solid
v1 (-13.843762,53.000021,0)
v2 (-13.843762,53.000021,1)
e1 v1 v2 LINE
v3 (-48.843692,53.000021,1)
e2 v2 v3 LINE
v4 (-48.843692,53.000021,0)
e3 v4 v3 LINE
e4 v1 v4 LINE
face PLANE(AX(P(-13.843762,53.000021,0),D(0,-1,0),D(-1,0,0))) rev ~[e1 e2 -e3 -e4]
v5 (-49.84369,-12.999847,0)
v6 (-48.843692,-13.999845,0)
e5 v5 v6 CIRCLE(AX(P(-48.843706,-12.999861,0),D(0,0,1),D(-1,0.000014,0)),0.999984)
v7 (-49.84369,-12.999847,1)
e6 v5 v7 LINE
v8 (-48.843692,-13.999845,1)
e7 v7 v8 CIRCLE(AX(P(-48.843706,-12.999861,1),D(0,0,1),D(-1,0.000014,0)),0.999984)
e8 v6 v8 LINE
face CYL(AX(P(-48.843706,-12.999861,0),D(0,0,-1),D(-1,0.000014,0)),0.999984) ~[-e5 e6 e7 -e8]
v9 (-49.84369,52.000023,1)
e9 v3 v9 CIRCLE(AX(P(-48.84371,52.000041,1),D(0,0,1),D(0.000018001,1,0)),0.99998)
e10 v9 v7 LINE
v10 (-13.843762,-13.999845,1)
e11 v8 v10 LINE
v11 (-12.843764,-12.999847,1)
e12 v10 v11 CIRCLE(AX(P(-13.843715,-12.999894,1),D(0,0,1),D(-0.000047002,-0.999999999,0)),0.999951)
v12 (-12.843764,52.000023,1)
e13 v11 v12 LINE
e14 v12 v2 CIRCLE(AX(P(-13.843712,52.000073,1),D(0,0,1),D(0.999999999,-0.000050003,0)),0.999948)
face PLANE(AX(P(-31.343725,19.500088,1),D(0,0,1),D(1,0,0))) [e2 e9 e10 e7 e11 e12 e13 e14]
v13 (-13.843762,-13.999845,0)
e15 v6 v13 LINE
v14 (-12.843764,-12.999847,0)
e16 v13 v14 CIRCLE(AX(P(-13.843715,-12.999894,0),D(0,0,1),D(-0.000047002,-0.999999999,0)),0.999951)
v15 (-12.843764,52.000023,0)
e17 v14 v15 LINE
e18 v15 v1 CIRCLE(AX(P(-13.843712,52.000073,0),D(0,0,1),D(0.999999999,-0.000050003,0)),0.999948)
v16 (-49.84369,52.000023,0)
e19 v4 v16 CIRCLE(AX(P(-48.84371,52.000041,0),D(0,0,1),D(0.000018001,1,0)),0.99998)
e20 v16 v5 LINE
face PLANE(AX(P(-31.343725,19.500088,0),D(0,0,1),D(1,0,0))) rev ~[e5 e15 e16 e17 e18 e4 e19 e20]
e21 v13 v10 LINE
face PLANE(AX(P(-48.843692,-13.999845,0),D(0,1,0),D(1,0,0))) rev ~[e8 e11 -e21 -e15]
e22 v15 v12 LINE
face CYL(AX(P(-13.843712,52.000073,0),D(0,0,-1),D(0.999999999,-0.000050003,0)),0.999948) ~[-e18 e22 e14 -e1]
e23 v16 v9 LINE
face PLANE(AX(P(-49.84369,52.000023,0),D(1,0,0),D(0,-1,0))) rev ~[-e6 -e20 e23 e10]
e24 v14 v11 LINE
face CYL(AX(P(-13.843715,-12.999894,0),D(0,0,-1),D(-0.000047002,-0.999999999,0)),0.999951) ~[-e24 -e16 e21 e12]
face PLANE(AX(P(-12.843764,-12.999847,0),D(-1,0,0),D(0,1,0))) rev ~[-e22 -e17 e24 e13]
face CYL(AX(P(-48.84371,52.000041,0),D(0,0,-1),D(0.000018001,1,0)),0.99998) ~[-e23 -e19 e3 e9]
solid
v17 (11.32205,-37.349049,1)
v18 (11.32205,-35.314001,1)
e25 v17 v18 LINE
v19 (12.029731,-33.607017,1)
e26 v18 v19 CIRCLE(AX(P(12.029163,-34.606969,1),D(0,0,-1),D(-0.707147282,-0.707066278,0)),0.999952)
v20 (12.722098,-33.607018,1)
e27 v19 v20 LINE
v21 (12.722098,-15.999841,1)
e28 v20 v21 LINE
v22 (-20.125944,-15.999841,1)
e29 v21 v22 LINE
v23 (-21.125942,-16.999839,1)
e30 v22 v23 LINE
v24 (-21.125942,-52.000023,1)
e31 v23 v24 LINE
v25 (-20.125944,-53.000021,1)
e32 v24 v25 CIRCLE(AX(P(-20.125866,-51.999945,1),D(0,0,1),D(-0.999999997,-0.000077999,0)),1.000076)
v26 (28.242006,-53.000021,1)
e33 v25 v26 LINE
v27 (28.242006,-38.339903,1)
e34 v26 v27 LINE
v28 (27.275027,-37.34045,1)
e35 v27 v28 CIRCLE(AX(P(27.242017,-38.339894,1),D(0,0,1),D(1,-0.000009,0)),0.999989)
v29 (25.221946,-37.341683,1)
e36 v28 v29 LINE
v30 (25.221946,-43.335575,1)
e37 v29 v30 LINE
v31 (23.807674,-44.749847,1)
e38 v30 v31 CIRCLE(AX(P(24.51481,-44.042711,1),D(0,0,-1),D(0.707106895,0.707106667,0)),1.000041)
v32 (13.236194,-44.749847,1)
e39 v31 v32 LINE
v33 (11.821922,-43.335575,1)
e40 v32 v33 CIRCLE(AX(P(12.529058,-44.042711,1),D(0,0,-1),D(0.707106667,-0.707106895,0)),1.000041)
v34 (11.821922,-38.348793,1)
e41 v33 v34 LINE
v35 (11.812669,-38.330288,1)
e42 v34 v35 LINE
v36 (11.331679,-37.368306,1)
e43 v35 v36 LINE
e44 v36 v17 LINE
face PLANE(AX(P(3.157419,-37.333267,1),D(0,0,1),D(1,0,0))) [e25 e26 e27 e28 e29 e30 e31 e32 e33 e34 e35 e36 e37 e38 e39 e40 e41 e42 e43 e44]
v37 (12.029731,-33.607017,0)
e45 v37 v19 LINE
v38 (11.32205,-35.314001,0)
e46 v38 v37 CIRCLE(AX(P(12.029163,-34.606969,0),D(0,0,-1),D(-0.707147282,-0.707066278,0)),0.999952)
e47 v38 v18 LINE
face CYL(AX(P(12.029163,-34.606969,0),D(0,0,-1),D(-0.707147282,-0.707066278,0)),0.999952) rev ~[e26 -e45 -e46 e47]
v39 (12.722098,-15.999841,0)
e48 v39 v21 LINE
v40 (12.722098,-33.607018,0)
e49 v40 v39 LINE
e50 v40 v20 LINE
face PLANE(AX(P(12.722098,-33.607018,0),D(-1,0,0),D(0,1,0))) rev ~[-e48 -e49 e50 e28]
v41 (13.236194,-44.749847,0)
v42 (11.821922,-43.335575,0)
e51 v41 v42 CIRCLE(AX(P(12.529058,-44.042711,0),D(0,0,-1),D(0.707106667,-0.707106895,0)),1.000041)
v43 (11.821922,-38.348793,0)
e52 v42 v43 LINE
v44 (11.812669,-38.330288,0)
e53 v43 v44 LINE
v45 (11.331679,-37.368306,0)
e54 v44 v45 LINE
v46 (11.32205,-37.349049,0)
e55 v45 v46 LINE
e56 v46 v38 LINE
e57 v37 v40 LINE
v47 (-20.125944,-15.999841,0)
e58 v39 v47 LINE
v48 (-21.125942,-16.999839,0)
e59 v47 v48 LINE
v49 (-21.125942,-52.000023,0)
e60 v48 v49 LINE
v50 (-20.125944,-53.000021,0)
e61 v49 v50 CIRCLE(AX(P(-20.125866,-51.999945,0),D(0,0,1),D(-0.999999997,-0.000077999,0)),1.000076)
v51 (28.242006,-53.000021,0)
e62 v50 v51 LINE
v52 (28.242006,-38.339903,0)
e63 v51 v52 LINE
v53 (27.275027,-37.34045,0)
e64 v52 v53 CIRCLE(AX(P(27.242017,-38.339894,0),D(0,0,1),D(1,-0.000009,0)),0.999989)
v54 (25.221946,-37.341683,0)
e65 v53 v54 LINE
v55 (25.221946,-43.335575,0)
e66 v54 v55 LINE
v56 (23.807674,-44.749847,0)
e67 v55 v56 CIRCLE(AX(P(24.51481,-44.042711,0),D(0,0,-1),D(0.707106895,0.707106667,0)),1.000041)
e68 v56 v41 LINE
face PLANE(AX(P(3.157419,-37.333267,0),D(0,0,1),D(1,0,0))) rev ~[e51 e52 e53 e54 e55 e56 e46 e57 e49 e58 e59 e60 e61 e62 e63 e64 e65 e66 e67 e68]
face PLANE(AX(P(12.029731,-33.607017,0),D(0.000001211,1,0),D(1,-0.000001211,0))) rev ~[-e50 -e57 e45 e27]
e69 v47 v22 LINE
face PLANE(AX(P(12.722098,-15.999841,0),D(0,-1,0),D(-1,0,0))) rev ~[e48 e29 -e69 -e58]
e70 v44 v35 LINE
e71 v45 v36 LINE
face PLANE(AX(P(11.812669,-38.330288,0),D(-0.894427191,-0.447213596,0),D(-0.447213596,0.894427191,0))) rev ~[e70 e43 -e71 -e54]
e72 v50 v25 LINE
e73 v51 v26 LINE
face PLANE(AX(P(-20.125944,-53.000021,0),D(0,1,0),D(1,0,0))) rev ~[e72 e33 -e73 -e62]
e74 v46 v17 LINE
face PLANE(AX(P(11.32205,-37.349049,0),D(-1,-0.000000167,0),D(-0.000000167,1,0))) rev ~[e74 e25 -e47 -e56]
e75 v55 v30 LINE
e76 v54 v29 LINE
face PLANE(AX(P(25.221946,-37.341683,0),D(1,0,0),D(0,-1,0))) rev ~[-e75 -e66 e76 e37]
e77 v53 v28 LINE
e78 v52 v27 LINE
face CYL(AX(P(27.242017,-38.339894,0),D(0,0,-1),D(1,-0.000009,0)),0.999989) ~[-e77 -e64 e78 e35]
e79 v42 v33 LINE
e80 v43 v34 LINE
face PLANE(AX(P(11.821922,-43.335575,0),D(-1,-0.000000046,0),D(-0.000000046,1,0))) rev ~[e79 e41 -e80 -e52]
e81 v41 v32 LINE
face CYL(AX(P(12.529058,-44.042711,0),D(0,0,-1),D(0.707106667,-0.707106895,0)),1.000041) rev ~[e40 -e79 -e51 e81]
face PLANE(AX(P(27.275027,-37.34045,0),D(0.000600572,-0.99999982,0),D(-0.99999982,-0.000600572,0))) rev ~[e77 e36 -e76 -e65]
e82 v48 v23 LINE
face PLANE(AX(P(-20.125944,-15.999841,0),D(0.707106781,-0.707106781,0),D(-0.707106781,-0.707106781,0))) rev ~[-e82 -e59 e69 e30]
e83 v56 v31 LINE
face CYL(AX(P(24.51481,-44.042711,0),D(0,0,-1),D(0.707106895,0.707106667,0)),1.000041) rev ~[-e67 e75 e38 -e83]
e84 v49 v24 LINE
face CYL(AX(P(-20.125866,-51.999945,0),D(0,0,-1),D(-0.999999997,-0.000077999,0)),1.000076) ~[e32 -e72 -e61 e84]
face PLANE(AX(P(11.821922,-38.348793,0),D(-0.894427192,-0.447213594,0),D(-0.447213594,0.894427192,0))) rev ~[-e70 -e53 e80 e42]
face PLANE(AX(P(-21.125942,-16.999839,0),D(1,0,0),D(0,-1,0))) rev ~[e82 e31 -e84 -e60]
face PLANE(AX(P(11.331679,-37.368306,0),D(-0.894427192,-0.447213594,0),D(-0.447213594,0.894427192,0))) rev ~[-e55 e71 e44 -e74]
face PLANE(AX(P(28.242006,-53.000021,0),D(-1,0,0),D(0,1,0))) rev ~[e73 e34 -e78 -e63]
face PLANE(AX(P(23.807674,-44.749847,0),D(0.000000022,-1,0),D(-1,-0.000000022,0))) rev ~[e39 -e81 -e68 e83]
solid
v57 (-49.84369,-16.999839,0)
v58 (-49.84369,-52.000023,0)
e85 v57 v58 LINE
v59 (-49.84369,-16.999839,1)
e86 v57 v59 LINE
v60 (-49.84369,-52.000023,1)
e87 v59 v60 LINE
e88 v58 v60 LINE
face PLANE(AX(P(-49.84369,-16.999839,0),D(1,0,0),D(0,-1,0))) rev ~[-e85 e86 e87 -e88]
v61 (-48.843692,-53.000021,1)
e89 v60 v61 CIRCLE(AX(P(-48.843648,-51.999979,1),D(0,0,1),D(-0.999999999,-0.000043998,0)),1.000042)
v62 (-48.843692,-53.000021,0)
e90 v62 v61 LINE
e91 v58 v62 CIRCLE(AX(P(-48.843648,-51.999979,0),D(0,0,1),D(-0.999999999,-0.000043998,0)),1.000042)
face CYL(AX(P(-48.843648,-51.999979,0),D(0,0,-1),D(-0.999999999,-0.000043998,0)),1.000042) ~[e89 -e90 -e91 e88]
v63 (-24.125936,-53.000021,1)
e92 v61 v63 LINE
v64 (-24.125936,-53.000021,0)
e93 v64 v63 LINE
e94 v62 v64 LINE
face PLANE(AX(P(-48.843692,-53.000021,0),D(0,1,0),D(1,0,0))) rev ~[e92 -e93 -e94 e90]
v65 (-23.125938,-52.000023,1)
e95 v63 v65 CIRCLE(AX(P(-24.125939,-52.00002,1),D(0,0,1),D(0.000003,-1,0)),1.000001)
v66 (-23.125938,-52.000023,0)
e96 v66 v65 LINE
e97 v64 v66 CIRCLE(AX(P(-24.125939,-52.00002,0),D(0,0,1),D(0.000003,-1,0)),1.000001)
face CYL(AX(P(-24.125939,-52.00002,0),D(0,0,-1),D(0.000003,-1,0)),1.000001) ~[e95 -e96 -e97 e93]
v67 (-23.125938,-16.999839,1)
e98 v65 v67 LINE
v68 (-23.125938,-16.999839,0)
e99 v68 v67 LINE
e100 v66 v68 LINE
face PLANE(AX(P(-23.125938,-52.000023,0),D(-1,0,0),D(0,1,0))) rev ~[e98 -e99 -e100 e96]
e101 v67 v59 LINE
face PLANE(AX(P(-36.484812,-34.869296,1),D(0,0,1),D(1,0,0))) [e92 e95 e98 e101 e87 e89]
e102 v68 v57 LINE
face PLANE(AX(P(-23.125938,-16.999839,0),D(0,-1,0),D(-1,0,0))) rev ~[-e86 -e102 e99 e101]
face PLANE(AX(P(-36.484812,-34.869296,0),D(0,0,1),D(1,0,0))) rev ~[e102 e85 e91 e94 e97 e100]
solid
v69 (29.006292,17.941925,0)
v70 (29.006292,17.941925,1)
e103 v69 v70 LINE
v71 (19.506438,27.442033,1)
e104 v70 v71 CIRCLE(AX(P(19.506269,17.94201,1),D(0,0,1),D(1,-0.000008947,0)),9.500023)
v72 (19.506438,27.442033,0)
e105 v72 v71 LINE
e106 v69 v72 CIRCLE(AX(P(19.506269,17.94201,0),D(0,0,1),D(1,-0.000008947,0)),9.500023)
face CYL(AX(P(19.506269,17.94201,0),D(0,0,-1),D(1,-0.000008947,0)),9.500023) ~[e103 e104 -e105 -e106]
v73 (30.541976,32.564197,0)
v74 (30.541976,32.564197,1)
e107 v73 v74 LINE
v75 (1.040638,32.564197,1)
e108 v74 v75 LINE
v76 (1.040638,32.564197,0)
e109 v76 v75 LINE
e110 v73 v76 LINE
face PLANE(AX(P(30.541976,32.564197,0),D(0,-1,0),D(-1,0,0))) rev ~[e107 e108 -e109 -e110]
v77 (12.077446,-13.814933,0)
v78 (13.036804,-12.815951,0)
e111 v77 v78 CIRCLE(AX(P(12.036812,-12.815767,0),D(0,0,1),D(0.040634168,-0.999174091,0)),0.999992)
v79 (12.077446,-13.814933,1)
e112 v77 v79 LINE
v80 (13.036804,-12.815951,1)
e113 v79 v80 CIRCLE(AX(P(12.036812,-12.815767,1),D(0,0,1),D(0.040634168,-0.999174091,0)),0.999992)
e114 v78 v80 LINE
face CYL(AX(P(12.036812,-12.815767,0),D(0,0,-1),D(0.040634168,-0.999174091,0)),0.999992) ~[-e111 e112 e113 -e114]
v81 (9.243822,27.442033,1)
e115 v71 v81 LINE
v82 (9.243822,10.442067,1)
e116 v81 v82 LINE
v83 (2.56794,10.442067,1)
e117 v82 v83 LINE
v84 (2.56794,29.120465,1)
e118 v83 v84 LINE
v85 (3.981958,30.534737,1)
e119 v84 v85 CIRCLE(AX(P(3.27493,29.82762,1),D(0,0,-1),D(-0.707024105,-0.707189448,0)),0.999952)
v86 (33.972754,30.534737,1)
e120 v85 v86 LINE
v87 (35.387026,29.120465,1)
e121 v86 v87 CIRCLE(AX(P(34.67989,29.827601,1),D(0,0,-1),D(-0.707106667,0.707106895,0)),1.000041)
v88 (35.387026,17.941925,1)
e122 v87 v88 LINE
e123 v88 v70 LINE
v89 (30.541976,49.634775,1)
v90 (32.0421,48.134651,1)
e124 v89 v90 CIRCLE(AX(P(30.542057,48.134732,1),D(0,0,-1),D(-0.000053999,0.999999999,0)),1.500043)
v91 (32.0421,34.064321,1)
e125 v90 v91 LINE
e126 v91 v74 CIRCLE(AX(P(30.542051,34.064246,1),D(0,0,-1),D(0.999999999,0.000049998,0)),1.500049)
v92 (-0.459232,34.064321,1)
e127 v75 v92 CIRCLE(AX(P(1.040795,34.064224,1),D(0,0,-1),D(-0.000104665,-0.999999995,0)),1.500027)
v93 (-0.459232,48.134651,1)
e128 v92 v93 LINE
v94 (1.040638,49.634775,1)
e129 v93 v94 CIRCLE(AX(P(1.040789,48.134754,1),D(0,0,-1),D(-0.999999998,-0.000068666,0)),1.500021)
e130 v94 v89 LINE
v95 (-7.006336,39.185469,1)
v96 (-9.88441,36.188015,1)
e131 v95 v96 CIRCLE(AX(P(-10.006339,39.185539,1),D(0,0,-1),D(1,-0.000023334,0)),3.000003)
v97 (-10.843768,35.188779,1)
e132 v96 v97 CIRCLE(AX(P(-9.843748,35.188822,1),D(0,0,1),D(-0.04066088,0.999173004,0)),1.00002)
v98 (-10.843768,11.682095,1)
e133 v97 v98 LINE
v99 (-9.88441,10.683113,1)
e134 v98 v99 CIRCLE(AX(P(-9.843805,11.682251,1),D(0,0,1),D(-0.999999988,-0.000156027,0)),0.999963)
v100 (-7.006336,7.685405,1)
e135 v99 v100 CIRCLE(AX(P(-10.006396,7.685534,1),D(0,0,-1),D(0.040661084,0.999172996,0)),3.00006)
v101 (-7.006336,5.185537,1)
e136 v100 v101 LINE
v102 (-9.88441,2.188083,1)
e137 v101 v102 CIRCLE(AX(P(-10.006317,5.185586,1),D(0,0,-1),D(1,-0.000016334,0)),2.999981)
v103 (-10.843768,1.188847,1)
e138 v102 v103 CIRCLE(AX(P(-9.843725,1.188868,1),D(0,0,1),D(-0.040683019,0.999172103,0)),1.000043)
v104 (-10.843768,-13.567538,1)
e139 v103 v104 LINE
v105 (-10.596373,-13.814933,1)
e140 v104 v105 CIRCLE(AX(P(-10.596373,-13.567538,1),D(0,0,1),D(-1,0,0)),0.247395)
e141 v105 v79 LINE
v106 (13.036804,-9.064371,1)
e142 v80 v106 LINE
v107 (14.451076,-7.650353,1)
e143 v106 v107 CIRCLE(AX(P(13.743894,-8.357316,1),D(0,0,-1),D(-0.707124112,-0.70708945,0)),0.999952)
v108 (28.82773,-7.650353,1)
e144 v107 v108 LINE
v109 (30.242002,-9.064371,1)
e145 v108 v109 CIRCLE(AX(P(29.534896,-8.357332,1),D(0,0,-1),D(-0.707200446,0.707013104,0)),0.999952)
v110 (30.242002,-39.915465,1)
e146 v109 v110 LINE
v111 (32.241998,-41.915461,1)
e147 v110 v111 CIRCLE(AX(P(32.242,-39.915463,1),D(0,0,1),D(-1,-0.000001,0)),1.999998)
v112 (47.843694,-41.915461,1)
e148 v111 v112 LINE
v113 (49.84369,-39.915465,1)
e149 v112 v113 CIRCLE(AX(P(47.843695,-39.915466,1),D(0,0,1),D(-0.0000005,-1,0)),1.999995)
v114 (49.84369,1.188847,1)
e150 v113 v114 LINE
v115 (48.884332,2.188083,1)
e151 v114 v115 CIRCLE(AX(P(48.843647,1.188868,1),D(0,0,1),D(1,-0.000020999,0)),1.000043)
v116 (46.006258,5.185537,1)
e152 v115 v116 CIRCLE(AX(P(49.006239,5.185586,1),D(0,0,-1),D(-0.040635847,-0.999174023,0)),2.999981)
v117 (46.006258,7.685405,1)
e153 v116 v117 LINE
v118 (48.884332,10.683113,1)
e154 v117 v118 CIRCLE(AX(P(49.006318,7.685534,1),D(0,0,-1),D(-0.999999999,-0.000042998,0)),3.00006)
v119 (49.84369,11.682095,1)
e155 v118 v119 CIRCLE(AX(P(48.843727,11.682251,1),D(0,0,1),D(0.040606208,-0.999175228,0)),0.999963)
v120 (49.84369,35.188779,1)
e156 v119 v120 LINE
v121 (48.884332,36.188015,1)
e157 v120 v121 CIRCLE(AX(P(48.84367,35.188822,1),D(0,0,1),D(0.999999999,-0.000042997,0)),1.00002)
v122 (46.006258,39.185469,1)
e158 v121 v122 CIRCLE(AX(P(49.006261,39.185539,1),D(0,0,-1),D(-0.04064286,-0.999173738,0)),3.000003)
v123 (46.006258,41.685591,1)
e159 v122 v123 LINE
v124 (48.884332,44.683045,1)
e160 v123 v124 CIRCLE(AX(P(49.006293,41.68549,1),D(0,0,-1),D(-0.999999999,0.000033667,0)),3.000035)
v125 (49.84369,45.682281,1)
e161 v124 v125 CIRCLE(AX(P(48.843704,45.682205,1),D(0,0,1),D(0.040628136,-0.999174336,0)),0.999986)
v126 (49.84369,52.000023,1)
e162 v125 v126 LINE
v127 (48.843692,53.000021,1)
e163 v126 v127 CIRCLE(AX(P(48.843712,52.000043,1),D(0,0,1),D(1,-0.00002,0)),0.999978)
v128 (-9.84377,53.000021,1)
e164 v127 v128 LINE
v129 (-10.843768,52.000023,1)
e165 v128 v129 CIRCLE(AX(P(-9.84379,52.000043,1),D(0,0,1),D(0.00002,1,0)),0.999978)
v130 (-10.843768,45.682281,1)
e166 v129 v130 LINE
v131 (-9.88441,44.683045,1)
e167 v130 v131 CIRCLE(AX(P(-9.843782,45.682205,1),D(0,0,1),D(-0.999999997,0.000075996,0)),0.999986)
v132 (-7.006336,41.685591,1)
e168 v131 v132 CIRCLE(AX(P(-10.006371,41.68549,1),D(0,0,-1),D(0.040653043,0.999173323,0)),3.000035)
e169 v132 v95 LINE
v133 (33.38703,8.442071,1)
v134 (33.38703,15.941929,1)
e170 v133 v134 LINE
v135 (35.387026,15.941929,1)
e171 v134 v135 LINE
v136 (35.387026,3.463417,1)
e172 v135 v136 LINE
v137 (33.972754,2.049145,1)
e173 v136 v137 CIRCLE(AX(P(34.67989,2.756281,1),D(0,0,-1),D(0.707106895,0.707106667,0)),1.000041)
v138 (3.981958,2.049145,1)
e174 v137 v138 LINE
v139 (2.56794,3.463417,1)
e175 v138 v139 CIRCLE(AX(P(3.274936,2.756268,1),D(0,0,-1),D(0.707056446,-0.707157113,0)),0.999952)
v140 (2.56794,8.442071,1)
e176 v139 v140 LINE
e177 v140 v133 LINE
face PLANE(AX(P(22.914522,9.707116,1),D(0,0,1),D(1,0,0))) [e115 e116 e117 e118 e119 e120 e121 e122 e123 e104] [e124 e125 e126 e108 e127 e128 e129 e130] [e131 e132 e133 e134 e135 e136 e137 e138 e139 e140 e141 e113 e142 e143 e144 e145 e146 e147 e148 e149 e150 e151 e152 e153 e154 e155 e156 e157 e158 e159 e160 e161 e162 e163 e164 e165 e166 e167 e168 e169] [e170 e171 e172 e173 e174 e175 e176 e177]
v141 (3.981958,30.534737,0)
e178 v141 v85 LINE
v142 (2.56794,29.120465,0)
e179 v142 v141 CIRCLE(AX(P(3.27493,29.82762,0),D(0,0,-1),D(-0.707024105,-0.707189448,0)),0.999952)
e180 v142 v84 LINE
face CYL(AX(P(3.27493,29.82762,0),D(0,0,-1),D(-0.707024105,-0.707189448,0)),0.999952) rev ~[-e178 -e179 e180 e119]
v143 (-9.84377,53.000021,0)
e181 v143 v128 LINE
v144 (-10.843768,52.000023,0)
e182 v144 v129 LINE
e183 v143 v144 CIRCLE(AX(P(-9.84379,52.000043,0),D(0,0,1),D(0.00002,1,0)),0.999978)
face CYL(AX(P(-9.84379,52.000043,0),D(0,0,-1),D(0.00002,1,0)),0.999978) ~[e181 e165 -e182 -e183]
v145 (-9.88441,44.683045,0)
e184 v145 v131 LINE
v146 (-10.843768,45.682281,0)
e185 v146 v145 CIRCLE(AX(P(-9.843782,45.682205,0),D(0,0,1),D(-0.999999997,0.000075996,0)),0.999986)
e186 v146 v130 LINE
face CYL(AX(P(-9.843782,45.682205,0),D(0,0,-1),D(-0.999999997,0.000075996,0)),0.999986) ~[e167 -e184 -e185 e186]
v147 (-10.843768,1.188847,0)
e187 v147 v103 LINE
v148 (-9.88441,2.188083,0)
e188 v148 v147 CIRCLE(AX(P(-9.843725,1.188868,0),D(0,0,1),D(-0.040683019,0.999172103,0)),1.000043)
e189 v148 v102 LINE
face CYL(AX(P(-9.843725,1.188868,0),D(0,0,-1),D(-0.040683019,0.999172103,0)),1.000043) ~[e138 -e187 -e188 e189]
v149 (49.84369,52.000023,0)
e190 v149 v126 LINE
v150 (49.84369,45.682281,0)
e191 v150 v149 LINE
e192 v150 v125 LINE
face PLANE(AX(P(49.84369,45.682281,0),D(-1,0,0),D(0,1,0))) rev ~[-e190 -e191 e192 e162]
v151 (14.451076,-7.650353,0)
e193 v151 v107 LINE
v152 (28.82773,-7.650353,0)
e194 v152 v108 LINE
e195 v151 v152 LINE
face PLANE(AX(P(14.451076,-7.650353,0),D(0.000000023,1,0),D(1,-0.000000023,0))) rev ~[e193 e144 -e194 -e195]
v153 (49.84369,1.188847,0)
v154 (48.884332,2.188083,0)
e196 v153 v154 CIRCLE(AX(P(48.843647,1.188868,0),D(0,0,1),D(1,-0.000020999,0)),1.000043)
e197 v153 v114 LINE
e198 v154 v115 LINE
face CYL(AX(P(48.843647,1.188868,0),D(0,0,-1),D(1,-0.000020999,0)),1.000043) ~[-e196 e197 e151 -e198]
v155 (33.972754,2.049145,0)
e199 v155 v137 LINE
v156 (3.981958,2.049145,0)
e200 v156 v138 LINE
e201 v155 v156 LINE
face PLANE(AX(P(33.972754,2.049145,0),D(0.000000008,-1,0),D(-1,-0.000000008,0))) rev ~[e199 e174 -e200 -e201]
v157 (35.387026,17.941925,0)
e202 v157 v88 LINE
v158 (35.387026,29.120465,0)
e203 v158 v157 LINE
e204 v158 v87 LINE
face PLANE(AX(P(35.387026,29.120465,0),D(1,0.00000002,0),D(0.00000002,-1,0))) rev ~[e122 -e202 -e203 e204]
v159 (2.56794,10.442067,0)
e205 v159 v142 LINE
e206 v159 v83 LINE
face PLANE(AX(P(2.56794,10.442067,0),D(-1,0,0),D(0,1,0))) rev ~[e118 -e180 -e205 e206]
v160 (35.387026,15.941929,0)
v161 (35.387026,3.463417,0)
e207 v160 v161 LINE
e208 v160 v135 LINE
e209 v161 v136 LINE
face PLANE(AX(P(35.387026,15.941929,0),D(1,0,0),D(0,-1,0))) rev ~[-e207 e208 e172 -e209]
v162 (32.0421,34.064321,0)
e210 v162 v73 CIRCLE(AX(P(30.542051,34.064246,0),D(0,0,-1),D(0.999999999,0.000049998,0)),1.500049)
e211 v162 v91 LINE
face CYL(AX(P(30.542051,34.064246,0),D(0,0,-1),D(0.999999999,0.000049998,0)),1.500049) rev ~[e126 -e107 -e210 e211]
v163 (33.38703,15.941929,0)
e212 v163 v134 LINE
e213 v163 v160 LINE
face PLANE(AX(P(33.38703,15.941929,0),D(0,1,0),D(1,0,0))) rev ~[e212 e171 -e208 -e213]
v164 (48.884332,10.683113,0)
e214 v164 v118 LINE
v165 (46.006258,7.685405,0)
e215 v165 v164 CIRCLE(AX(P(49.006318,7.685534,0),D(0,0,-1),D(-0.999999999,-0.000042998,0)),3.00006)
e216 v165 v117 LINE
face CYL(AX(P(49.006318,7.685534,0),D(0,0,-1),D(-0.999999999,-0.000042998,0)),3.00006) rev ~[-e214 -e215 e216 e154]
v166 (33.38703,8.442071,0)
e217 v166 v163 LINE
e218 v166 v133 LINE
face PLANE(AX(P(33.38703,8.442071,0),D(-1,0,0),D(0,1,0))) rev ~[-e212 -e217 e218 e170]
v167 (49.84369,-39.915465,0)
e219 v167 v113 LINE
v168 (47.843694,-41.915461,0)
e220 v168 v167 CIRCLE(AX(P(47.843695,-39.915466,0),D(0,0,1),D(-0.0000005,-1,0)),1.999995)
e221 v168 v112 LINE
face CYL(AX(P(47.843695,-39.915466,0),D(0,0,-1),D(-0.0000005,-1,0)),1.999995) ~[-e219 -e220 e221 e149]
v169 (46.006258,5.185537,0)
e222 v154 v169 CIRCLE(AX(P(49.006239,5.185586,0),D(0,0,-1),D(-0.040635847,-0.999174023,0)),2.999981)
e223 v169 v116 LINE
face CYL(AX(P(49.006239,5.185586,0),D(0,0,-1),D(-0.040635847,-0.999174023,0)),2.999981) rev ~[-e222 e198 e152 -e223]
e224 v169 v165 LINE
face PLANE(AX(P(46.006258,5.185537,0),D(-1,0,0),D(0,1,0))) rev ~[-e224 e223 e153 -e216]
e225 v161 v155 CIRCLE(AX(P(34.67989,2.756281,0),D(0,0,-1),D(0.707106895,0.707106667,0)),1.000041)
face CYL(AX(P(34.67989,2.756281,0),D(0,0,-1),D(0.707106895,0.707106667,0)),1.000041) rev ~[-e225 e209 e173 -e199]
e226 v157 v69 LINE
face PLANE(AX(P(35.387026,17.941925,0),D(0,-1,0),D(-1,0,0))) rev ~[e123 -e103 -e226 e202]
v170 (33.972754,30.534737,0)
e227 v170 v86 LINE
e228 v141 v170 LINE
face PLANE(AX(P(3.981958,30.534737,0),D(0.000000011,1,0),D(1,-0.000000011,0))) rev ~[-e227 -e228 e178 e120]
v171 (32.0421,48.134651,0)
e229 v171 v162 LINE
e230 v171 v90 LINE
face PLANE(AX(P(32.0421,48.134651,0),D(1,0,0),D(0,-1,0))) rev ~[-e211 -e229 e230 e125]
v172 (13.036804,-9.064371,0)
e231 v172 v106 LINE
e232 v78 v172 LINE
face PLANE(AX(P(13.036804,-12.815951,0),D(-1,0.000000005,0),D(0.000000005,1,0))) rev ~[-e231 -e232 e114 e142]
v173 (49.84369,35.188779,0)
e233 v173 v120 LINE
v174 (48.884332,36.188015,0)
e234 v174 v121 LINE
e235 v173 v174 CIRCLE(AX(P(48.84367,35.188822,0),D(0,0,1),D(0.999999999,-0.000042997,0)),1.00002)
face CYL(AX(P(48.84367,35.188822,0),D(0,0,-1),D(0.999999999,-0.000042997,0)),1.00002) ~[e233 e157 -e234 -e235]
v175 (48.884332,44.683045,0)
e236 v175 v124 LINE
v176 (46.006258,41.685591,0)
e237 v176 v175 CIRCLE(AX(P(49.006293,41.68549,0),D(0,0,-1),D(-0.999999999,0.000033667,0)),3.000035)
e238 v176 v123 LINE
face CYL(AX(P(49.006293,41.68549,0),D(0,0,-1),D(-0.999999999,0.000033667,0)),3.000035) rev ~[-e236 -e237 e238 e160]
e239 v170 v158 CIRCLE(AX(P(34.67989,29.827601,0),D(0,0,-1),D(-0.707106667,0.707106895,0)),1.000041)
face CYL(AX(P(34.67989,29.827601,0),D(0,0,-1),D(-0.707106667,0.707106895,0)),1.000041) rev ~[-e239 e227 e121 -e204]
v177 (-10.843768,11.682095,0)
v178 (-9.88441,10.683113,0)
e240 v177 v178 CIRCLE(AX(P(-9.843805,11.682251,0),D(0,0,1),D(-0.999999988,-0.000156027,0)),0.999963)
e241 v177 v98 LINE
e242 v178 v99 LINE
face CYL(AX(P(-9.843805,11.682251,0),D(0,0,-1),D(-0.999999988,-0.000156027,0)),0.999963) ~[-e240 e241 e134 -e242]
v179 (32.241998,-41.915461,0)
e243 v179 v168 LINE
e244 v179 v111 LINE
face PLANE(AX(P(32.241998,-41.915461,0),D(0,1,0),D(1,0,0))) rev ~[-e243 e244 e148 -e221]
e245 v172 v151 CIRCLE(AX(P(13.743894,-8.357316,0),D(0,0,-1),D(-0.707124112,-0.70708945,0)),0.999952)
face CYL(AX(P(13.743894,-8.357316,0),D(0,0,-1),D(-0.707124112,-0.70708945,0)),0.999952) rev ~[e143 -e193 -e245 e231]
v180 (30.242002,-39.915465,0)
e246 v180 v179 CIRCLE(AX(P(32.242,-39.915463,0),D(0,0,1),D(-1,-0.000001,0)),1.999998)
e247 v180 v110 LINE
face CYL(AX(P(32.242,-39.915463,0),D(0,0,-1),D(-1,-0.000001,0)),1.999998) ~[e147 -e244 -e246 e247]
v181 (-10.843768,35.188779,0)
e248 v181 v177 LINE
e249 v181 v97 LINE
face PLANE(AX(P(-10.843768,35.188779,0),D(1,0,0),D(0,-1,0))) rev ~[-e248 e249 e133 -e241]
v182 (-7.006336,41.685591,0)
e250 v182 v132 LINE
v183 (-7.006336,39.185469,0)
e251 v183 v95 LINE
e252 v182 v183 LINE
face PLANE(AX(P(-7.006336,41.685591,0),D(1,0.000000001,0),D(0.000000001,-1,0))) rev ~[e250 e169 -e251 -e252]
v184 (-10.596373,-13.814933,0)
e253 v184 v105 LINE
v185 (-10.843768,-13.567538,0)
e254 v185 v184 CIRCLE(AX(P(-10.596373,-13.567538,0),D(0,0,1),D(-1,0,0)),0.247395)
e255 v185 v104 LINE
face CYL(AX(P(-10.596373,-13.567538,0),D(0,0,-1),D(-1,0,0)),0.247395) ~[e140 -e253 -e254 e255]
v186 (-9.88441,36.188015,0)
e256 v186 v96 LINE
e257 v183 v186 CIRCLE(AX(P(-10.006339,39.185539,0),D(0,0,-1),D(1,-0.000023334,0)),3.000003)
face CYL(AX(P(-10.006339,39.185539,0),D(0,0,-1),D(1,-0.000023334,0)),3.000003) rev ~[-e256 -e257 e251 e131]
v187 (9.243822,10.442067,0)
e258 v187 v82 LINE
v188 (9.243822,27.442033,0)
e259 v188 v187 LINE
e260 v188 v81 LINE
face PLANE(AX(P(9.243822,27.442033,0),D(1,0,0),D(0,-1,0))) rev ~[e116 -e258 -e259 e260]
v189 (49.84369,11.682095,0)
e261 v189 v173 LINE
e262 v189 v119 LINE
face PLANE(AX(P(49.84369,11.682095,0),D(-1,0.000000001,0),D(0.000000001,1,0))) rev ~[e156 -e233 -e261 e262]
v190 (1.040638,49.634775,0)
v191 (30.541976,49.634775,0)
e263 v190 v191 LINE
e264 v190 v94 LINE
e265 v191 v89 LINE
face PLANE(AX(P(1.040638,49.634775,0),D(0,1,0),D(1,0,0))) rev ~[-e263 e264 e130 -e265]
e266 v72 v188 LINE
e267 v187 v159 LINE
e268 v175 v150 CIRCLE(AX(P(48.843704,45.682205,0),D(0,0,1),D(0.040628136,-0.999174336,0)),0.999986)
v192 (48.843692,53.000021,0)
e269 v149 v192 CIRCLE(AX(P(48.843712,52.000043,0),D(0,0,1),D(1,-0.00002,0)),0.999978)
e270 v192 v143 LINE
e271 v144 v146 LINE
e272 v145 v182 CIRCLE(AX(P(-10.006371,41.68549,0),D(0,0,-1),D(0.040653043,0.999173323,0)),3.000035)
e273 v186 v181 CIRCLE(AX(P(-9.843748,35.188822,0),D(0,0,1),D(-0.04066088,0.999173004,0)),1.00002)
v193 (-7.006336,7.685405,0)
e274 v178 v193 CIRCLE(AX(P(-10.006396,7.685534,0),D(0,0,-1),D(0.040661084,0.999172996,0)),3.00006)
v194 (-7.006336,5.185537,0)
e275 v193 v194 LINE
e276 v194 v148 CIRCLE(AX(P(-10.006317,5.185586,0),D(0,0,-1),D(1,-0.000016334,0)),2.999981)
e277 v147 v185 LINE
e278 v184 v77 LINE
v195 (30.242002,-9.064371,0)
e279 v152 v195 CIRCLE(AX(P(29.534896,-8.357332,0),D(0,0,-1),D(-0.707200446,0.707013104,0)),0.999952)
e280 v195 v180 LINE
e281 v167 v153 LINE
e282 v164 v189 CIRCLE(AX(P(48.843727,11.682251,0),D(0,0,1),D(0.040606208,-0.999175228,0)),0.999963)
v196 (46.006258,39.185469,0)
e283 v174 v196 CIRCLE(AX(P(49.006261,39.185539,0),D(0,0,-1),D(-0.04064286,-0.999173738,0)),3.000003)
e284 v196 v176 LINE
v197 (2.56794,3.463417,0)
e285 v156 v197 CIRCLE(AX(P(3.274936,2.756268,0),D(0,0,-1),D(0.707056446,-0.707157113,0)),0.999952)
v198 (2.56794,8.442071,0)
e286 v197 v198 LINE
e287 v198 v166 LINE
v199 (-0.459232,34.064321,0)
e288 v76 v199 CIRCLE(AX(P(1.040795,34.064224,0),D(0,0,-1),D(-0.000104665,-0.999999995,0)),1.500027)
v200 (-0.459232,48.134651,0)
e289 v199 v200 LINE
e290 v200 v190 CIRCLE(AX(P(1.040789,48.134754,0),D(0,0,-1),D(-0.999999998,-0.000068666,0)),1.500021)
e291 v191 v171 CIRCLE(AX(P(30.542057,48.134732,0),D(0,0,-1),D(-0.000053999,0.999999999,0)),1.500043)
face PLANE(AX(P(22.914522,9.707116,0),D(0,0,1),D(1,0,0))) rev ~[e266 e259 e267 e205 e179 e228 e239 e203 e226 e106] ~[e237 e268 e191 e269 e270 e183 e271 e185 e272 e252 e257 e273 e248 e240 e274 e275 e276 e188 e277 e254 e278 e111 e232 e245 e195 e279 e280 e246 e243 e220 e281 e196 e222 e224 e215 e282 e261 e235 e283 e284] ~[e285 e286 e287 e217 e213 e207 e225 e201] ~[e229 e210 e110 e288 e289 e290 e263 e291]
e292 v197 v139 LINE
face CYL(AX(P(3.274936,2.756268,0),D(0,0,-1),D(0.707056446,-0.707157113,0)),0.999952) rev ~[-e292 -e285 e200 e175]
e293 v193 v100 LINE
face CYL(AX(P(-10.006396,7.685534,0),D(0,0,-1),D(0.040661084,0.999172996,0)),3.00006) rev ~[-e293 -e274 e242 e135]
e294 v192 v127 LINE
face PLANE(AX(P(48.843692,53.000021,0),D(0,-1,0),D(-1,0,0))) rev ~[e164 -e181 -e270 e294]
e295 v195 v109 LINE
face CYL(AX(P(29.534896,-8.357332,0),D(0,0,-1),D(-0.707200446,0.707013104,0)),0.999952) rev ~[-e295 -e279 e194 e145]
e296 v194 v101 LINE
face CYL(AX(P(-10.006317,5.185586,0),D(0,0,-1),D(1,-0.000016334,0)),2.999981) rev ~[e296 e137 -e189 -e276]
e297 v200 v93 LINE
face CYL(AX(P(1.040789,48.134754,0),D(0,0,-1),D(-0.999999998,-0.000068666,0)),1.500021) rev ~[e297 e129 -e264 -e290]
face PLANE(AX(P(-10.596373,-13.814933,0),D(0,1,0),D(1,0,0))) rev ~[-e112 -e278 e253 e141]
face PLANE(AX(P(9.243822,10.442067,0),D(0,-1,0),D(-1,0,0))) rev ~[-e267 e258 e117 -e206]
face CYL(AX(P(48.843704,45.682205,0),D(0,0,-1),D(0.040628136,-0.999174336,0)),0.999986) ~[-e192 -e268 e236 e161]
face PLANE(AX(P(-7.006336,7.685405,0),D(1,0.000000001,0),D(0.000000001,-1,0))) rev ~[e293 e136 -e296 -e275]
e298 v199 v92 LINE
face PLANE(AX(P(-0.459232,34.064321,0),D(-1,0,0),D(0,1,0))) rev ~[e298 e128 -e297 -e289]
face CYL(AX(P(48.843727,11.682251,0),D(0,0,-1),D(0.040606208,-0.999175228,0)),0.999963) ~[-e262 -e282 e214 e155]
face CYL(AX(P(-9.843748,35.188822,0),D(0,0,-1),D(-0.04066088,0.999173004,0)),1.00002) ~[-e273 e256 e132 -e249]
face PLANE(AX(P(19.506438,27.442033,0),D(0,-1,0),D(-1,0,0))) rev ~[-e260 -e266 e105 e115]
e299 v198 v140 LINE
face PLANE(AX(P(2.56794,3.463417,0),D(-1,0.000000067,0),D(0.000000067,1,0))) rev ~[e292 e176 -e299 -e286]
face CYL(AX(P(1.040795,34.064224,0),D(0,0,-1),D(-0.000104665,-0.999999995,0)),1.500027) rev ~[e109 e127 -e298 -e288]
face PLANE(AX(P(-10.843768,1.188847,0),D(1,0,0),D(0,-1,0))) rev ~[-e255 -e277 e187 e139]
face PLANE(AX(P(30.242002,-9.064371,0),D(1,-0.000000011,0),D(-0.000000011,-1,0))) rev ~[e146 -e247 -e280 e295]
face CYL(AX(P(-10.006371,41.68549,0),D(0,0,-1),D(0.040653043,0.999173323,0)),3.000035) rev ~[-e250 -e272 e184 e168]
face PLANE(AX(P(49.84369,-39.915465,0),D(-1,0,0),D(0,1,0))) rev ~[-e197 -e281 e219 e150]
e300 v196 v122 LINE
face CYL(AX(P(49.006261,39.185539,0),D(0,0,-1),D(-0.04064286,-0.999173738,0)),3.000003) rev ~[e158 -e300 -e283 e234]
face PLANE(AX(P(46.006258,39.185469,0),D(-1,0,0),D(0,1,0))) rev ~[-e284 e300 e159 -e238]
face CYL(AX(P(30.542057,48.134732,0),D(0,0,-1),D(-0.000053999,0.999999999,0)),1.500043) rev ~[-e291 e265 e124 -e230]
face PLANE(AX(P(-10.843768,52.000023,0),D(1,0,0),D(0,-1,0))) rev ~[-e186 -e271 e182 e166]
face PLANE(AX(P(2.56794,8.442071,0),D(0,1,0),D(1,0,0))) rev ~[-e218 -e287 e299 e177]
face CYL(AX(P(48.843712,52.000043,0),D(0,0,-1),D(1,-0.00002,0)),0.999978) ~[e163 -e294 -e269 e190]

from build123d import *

# Parameters (mm, degrees)
F1_DEPTH = 1


# Not quite as in the source:
# - ends of sketch curves that miss each other by under 0.0002 mm in the source are joined


with BuildPart() as f1:
    # F0 (on Top) → F1 (new body)
    with BuildSketch(Plane.XY):
        with BuildLine():
            Line((-49.84369, 52.000023), (-49.84369, -4.632071))
            Line((-49.84369, -4.632071), (-49.84369, -12.999847))
            ThreePointArc((-49.84369, -12.999847), (-49.5508014675, -13.7069564675), (-48.843692, -13.999845))
            Line((-48.843692, -13.999845), (-13.843762, -13.999845))
            ThreePointArc((-13.843762, -13.9998449989), (-13.136642867, -13.706966133), (-12.8437640011, -12.999847))
            Line((-12.843764, -12.999847), (-12.843764, -4.632071))
            Line((-12.843764, -4.632071), (-12.843764, 52.000023))
            ThreePointArc((-12.8437640013, 52.000023), (-13.1366419884, 52.7071430116), (-13.843762, 53.0000209987))
            Line((-13.843762, 53.000021), (-48.843692, 53.000021))
            ThreePointArc((-48.843692, 53.0000209998), (-49.5508026391, 52.7071336391), (-49.8436899998, 52.000023))
        make_face()
    extrude(amount=F1_DEPTH)


with BuildPart() as f1b:
    # F0 (on Top) → F1, piece 2 (new body)
    with BuildSketch(Plane.XY):
        with BuildLine():
            Line((-48.843692, -53.000021), (-24.125936, -53.000021))
            ThreePointArc((-24.125936, -53.000021), (-23.4188315117, -52.7071274883), (-23.125938, -52.000023))
            Line((-23.125938, -52.000023), (-23.125938, -16.999839))
            Line((-23.125938, -16.999839), (-49.84369, -16.999839))
            Line((-49.84369, -16.999839), (-49.84369, -52.000023))
            ThreePointArc((-49.843689999, -52.000023), (-49.5507844797, -52.7071154797), (-48.843692, -53.000020999))
        make_face()
    extrude(amount=F1_DEPTH)


with BuildPart() as f1c:
    # F0 (on Top) → F1, piece 3 (new body)
    with BuildSketch(Plane.XY):
        with BuildLine():
            ThreePointArc((11.3220496611, -35.3140013389), (11.1054475003, -34.2240151152), (12.0297310005, -33.6070171613))
            Line((12.0297310005, -33.6070171613), (12.722098, -33.607018))
            Line((12.722098, -33.607018), (12.722098, -15.999841))
            Line((12.722098, -15.999841), (-20.125944, -15.999841))
            Line((-20.125944, -15.999841), (-21.125942, -16.999839))
            Line((-21.125942, -16.999839), (-21.125942, -52.000023))
            ThreePointArc((-21.125942, -52.000023), (-20.8330265213, -52.7071055213), (-20.125944, -53.000020997))
            Line((-20.125944, -53.000020997), (28.242006, -53.000021))
            Line((28.242006, -53.000021), (28.242006, -52.000023))
            Line((28.242006, -52.000023), (28.242006, -38.339903))
            ThreePointArc((28.242006, -38.339903), (27.9606950958, -37.6445668865), (27.2750267787, -37.3404499772))
            Line((27.2750267787, -37.3404499772), (25.221946, -37.341683))
            Line((25.221946, -37.341683), (25.221946, -43.335575))
            ThreePointArc((25.221946, -43.335575), (25.2219457726, -44.7498467726), (23.8076742274, -44.7498467726))
            Line((23.8076742274, -44.7498467726), (13.236194, -44.749847))
            ThreePointArc((13.236194, -44.749847), (11.8219222274, -44.7498467726), (11.8219222274, -43.3355752274))
            Line((11.8219222274, -43.3355752274), (11.821922, -38.348793))
            Line((11.821922, -38.348793), (11.8126693234, -38.3302876467))
            Line((11.8126693234, -38.3302876467), (11.3316786766, -37.3683063533))
            Line((11.3316786766, -37.3683063533), (11.32205, -37.349049))
            Line((11.32205, -37.349049), (11.3220496611, -35.3140013389))
        make_face()
    extrude(amount=F1_DEPTH)


with BuildPart() as f1d:
    # F0 (on Top) → F1, piece 4 (new body)
    with BuildSketch(Plane.XY):
        with BuildLine():
            Line((-9.84377, -13.814933), (12.077446, -13.814933))
            ThreePointArc((12.077446, -13.814933), (12.7580726434, -13.5084192102), (13.0368039831, -12.815951))
            Line((13.0368039831, -12.815951), (13.036804, -9.064371))
            ThreePointArc((13.036804, -9.064371), (13.0368846628, -7.6501796628), (14.4510763316, -7.6503526685))
            Line((14.4510763316, -7.6503526685), (28.82773, -7.650353))
            ThreePointArc((28.82773, -7.650353), (30.2419053372, -7.6501956628), (30.2420023393, -9.0643713393))
            Line((30.2420023393, -9.0643713393), (30.242002, -39.915465))
            ThreePointArc((30.242002, -39.915465), (30.8277878518, -41.3296751482), (32.241998, -41.915461))
            Line((32.241998, -41.915461), (47.843694, -41.915461))
            ThreePointArc((47.843694, -41.915461), (49.2579050268, -41.3296760268), (49.84369, -39.915465))
            Line((49.84369, -39.915465), (49.84369, 1.188847))
            ThreePointArc((49.84369, 1.188847), (49.5650323815, 1.8814639379), (48.8843320024, 2.1880830581))
            ThreePointArc((48.8843320024, 2.1880830581), (46.8422776076, 3.1078090407), (46.0062580004, 5.185537))
            Line((46.0062580004, 5.185537), (46.006258, 7.685405))
            ThreePointArc((46.006258, 7.685405), (46.8422117178, 9.7632741192), (48.884332003, 10.6831129264))
            ThreePointArc((48.884332003, 10.6831129264), (49.5649667808, 10.9896189332), (49.8436899878, 11.682095))
            Line((49.8436899878, 11.682095), (49.84369, 35.188779))
            ThreePointArc((49.84369, 35.188779), (49.5650387607, 35.8814020397), (48.884331999, 36.1880149755))
            ThreePointArc((48.884331999, 36.1880149755), (46.8422836938, 37.10774685), (46.0062580008, 39.185469))
            Line((46.0062580008, 39.185469), (46.006258, 41.685591))
            ThreePointArc((46.006258, 41.685591), (46.8422927104, 43.7633044161), (48.8843320031, 44.683044923))
            ThreePointArc((48.8843320031, 44.683044923), (49.5650483633, 44.9896486415), (49.8436899971, 45.682281))
            Line((49.8436899971, 45.682281), (49.84369, 52.000023))
            ThreePointArc((49.84369, 52.000023), (49.5508032248, 52.7071342248), (48.843692, 53.0000209998))
            Line((48.843692, 53.0000209998), (-9.84377, 53.000021))
            ThreePointArc((-9.84377, 53.000021), (-10.5508812248, 52.7071342248), (-10.8437679998, 52.000023))
            Line((-10.8437679998, 52.000023), (-10.843768, 45.682281))
            ThreePointArc((-10.843768, 45.682281), (-10.5651263633, 44.9896486415), (-9.8844100134, 44.6830446702))
            ThreePointArc((-9.8844100134, 44.6830446702), (-7.8423707104, 43.7633044161), (-7.0063360017, 41.685591))
            Line((-7.0063360017, 41.685591), (-7.006336, 39.185469))
            ThreePointArc((-7.006336, 39.185469), (-7.8423616938, 37.10774685), (-9.884409992, 36.1880148021))
            ThreePointArc((-9.884409992, 36.1880148021), (-10.5651167607, 35.8814020397), (-10.8437679991, 35.188779))
            Line((-10.8437679991, 35.188779), (-10.843768, 11.682095))
            ThreePointArc((-10.843768, 11.682095), (-10.5650447808, 10.9896189332), (-9.88441001, 10.683112754))
            ThreePointArc((-9.88441001, 10.683112754), (-7.8422897178, 9.7632741192), (-7.0063360028, 7.685405))
            Line((-7.0063360028, 7.685405), (-7.006336, 5.185537))
            ThreePointArc((-7.006336, 5.185537), (-7.8423556076, 3.1078090407), (-9.884409997, 2.1880829253))
            ThreePointArc((-9.884409997, 2.1880829253), (-10.5651103815, 1.8814639379), (-10.8437679998, 1.188847))
            Line((-10.8437679998, 1.188847), (-10.8437679998, -13.5675381968))
            ThreePointArc((-10.8437679998, -13.5675381968), (-10.7713077396, -13.7424727398), (-10.5963731966, -13.814933))
            Line((-10.5963731966, -13.814933), (-9.84377, -13.814933))
        make_face()
        with BuildLine():
            Line((33.38703, 8.442071), (33.38703, 15.941929))
            Line((33.38703, 15.941929), (35.387026, 15.941929))
            Line((35.387026, 15.941929), (35.387026, 3.463417))
            ThreePointArc((35.387026, 3.463417), (35.3870257726, 2.0491452274), (33.9727542274, 2.0491452274))
            Line((33.9727542274, 2.0491452274), (3.981958, 2.049145))
            ThreePointArc((3.981958, 2.049145), (2.5677996628, 2.0492586628), (2.5679396641, 3.463417336))
            Line((2.5679396641, 3.463417336), (2.56794, 8.442071))
            Line((2.56794, 8.442071), (33.38703, 8.442071))
        make_face(mode=Mode.SUBTRACT)
        with BuildLine():
            Line((35.387026, 17.941925), (29.006292, 17.941925))
            ThreePointArc((29.006292, 17.941925), (26.2238894867, 24.6594508816), (19.506438, 27.4420329985))
            Line((19.506438, 27.4420329985), (9.243822, 27.442033))
            Line((9.243822, 27.442033), (9.243822, 10.442067))
            Line((9.243822, 10.442067), (2.56794, 10.442067))
            Line((2.56794, 10.442067), (2.56794, 29.120465))
            ThreePointArc((2.56794, 29.120465), (2.5677936628, 30.5346293372), (3.9819583386, 30.5347373387))
            Line((3.9819583386, 30.5347373387), (33.972754, 30.534737))
            ThreePointArc((33.972754, 30.534737), (35.3870257726, 30.5347367726), (35.3870257726, 29.1204652274))
            Line((35.3870257726, 29.1204652274), (35.387026, 17.941925))
        make_face(mode=Mode.SUBTRACT)
        with BuildLine():
            ThreePointArc((32.0420999981, 34.064321), (31.60274582, 33.00355118), (30.541976, 32.5641970019))
            Line((30.541976, 32.564197), (1.040638, 32.564197))
            ThreePointArc((1.040638, 32.5641970082), (-0.0199740624, 33.0036345427), (-0.4592319969, 34.064321))
            Line((-0.459232, 34.064321), (-0.459232, 48.134651))
            ThreePointArc((-0.4592319965, 48.134651), (-0.0199758198, 49.1953392147), (1.040638, 49.6347749924))
            Line((1.040638, 49.634775), (30.541976, 49.634775))
            ThreePointArc((30.541976, 49.6347749978), (31.6027475774, 49.1954225774), (32.0420999978, 48.134651))
            Line((32.0421, 48.134651), (32.0421, 34.064321))
        make_face(mode=Mode.SUBTRACT)
    extrude(amount=F1_DEPTH)


solid = Compound([f1.part, f1b.part, f1c.part, f1d.part])
